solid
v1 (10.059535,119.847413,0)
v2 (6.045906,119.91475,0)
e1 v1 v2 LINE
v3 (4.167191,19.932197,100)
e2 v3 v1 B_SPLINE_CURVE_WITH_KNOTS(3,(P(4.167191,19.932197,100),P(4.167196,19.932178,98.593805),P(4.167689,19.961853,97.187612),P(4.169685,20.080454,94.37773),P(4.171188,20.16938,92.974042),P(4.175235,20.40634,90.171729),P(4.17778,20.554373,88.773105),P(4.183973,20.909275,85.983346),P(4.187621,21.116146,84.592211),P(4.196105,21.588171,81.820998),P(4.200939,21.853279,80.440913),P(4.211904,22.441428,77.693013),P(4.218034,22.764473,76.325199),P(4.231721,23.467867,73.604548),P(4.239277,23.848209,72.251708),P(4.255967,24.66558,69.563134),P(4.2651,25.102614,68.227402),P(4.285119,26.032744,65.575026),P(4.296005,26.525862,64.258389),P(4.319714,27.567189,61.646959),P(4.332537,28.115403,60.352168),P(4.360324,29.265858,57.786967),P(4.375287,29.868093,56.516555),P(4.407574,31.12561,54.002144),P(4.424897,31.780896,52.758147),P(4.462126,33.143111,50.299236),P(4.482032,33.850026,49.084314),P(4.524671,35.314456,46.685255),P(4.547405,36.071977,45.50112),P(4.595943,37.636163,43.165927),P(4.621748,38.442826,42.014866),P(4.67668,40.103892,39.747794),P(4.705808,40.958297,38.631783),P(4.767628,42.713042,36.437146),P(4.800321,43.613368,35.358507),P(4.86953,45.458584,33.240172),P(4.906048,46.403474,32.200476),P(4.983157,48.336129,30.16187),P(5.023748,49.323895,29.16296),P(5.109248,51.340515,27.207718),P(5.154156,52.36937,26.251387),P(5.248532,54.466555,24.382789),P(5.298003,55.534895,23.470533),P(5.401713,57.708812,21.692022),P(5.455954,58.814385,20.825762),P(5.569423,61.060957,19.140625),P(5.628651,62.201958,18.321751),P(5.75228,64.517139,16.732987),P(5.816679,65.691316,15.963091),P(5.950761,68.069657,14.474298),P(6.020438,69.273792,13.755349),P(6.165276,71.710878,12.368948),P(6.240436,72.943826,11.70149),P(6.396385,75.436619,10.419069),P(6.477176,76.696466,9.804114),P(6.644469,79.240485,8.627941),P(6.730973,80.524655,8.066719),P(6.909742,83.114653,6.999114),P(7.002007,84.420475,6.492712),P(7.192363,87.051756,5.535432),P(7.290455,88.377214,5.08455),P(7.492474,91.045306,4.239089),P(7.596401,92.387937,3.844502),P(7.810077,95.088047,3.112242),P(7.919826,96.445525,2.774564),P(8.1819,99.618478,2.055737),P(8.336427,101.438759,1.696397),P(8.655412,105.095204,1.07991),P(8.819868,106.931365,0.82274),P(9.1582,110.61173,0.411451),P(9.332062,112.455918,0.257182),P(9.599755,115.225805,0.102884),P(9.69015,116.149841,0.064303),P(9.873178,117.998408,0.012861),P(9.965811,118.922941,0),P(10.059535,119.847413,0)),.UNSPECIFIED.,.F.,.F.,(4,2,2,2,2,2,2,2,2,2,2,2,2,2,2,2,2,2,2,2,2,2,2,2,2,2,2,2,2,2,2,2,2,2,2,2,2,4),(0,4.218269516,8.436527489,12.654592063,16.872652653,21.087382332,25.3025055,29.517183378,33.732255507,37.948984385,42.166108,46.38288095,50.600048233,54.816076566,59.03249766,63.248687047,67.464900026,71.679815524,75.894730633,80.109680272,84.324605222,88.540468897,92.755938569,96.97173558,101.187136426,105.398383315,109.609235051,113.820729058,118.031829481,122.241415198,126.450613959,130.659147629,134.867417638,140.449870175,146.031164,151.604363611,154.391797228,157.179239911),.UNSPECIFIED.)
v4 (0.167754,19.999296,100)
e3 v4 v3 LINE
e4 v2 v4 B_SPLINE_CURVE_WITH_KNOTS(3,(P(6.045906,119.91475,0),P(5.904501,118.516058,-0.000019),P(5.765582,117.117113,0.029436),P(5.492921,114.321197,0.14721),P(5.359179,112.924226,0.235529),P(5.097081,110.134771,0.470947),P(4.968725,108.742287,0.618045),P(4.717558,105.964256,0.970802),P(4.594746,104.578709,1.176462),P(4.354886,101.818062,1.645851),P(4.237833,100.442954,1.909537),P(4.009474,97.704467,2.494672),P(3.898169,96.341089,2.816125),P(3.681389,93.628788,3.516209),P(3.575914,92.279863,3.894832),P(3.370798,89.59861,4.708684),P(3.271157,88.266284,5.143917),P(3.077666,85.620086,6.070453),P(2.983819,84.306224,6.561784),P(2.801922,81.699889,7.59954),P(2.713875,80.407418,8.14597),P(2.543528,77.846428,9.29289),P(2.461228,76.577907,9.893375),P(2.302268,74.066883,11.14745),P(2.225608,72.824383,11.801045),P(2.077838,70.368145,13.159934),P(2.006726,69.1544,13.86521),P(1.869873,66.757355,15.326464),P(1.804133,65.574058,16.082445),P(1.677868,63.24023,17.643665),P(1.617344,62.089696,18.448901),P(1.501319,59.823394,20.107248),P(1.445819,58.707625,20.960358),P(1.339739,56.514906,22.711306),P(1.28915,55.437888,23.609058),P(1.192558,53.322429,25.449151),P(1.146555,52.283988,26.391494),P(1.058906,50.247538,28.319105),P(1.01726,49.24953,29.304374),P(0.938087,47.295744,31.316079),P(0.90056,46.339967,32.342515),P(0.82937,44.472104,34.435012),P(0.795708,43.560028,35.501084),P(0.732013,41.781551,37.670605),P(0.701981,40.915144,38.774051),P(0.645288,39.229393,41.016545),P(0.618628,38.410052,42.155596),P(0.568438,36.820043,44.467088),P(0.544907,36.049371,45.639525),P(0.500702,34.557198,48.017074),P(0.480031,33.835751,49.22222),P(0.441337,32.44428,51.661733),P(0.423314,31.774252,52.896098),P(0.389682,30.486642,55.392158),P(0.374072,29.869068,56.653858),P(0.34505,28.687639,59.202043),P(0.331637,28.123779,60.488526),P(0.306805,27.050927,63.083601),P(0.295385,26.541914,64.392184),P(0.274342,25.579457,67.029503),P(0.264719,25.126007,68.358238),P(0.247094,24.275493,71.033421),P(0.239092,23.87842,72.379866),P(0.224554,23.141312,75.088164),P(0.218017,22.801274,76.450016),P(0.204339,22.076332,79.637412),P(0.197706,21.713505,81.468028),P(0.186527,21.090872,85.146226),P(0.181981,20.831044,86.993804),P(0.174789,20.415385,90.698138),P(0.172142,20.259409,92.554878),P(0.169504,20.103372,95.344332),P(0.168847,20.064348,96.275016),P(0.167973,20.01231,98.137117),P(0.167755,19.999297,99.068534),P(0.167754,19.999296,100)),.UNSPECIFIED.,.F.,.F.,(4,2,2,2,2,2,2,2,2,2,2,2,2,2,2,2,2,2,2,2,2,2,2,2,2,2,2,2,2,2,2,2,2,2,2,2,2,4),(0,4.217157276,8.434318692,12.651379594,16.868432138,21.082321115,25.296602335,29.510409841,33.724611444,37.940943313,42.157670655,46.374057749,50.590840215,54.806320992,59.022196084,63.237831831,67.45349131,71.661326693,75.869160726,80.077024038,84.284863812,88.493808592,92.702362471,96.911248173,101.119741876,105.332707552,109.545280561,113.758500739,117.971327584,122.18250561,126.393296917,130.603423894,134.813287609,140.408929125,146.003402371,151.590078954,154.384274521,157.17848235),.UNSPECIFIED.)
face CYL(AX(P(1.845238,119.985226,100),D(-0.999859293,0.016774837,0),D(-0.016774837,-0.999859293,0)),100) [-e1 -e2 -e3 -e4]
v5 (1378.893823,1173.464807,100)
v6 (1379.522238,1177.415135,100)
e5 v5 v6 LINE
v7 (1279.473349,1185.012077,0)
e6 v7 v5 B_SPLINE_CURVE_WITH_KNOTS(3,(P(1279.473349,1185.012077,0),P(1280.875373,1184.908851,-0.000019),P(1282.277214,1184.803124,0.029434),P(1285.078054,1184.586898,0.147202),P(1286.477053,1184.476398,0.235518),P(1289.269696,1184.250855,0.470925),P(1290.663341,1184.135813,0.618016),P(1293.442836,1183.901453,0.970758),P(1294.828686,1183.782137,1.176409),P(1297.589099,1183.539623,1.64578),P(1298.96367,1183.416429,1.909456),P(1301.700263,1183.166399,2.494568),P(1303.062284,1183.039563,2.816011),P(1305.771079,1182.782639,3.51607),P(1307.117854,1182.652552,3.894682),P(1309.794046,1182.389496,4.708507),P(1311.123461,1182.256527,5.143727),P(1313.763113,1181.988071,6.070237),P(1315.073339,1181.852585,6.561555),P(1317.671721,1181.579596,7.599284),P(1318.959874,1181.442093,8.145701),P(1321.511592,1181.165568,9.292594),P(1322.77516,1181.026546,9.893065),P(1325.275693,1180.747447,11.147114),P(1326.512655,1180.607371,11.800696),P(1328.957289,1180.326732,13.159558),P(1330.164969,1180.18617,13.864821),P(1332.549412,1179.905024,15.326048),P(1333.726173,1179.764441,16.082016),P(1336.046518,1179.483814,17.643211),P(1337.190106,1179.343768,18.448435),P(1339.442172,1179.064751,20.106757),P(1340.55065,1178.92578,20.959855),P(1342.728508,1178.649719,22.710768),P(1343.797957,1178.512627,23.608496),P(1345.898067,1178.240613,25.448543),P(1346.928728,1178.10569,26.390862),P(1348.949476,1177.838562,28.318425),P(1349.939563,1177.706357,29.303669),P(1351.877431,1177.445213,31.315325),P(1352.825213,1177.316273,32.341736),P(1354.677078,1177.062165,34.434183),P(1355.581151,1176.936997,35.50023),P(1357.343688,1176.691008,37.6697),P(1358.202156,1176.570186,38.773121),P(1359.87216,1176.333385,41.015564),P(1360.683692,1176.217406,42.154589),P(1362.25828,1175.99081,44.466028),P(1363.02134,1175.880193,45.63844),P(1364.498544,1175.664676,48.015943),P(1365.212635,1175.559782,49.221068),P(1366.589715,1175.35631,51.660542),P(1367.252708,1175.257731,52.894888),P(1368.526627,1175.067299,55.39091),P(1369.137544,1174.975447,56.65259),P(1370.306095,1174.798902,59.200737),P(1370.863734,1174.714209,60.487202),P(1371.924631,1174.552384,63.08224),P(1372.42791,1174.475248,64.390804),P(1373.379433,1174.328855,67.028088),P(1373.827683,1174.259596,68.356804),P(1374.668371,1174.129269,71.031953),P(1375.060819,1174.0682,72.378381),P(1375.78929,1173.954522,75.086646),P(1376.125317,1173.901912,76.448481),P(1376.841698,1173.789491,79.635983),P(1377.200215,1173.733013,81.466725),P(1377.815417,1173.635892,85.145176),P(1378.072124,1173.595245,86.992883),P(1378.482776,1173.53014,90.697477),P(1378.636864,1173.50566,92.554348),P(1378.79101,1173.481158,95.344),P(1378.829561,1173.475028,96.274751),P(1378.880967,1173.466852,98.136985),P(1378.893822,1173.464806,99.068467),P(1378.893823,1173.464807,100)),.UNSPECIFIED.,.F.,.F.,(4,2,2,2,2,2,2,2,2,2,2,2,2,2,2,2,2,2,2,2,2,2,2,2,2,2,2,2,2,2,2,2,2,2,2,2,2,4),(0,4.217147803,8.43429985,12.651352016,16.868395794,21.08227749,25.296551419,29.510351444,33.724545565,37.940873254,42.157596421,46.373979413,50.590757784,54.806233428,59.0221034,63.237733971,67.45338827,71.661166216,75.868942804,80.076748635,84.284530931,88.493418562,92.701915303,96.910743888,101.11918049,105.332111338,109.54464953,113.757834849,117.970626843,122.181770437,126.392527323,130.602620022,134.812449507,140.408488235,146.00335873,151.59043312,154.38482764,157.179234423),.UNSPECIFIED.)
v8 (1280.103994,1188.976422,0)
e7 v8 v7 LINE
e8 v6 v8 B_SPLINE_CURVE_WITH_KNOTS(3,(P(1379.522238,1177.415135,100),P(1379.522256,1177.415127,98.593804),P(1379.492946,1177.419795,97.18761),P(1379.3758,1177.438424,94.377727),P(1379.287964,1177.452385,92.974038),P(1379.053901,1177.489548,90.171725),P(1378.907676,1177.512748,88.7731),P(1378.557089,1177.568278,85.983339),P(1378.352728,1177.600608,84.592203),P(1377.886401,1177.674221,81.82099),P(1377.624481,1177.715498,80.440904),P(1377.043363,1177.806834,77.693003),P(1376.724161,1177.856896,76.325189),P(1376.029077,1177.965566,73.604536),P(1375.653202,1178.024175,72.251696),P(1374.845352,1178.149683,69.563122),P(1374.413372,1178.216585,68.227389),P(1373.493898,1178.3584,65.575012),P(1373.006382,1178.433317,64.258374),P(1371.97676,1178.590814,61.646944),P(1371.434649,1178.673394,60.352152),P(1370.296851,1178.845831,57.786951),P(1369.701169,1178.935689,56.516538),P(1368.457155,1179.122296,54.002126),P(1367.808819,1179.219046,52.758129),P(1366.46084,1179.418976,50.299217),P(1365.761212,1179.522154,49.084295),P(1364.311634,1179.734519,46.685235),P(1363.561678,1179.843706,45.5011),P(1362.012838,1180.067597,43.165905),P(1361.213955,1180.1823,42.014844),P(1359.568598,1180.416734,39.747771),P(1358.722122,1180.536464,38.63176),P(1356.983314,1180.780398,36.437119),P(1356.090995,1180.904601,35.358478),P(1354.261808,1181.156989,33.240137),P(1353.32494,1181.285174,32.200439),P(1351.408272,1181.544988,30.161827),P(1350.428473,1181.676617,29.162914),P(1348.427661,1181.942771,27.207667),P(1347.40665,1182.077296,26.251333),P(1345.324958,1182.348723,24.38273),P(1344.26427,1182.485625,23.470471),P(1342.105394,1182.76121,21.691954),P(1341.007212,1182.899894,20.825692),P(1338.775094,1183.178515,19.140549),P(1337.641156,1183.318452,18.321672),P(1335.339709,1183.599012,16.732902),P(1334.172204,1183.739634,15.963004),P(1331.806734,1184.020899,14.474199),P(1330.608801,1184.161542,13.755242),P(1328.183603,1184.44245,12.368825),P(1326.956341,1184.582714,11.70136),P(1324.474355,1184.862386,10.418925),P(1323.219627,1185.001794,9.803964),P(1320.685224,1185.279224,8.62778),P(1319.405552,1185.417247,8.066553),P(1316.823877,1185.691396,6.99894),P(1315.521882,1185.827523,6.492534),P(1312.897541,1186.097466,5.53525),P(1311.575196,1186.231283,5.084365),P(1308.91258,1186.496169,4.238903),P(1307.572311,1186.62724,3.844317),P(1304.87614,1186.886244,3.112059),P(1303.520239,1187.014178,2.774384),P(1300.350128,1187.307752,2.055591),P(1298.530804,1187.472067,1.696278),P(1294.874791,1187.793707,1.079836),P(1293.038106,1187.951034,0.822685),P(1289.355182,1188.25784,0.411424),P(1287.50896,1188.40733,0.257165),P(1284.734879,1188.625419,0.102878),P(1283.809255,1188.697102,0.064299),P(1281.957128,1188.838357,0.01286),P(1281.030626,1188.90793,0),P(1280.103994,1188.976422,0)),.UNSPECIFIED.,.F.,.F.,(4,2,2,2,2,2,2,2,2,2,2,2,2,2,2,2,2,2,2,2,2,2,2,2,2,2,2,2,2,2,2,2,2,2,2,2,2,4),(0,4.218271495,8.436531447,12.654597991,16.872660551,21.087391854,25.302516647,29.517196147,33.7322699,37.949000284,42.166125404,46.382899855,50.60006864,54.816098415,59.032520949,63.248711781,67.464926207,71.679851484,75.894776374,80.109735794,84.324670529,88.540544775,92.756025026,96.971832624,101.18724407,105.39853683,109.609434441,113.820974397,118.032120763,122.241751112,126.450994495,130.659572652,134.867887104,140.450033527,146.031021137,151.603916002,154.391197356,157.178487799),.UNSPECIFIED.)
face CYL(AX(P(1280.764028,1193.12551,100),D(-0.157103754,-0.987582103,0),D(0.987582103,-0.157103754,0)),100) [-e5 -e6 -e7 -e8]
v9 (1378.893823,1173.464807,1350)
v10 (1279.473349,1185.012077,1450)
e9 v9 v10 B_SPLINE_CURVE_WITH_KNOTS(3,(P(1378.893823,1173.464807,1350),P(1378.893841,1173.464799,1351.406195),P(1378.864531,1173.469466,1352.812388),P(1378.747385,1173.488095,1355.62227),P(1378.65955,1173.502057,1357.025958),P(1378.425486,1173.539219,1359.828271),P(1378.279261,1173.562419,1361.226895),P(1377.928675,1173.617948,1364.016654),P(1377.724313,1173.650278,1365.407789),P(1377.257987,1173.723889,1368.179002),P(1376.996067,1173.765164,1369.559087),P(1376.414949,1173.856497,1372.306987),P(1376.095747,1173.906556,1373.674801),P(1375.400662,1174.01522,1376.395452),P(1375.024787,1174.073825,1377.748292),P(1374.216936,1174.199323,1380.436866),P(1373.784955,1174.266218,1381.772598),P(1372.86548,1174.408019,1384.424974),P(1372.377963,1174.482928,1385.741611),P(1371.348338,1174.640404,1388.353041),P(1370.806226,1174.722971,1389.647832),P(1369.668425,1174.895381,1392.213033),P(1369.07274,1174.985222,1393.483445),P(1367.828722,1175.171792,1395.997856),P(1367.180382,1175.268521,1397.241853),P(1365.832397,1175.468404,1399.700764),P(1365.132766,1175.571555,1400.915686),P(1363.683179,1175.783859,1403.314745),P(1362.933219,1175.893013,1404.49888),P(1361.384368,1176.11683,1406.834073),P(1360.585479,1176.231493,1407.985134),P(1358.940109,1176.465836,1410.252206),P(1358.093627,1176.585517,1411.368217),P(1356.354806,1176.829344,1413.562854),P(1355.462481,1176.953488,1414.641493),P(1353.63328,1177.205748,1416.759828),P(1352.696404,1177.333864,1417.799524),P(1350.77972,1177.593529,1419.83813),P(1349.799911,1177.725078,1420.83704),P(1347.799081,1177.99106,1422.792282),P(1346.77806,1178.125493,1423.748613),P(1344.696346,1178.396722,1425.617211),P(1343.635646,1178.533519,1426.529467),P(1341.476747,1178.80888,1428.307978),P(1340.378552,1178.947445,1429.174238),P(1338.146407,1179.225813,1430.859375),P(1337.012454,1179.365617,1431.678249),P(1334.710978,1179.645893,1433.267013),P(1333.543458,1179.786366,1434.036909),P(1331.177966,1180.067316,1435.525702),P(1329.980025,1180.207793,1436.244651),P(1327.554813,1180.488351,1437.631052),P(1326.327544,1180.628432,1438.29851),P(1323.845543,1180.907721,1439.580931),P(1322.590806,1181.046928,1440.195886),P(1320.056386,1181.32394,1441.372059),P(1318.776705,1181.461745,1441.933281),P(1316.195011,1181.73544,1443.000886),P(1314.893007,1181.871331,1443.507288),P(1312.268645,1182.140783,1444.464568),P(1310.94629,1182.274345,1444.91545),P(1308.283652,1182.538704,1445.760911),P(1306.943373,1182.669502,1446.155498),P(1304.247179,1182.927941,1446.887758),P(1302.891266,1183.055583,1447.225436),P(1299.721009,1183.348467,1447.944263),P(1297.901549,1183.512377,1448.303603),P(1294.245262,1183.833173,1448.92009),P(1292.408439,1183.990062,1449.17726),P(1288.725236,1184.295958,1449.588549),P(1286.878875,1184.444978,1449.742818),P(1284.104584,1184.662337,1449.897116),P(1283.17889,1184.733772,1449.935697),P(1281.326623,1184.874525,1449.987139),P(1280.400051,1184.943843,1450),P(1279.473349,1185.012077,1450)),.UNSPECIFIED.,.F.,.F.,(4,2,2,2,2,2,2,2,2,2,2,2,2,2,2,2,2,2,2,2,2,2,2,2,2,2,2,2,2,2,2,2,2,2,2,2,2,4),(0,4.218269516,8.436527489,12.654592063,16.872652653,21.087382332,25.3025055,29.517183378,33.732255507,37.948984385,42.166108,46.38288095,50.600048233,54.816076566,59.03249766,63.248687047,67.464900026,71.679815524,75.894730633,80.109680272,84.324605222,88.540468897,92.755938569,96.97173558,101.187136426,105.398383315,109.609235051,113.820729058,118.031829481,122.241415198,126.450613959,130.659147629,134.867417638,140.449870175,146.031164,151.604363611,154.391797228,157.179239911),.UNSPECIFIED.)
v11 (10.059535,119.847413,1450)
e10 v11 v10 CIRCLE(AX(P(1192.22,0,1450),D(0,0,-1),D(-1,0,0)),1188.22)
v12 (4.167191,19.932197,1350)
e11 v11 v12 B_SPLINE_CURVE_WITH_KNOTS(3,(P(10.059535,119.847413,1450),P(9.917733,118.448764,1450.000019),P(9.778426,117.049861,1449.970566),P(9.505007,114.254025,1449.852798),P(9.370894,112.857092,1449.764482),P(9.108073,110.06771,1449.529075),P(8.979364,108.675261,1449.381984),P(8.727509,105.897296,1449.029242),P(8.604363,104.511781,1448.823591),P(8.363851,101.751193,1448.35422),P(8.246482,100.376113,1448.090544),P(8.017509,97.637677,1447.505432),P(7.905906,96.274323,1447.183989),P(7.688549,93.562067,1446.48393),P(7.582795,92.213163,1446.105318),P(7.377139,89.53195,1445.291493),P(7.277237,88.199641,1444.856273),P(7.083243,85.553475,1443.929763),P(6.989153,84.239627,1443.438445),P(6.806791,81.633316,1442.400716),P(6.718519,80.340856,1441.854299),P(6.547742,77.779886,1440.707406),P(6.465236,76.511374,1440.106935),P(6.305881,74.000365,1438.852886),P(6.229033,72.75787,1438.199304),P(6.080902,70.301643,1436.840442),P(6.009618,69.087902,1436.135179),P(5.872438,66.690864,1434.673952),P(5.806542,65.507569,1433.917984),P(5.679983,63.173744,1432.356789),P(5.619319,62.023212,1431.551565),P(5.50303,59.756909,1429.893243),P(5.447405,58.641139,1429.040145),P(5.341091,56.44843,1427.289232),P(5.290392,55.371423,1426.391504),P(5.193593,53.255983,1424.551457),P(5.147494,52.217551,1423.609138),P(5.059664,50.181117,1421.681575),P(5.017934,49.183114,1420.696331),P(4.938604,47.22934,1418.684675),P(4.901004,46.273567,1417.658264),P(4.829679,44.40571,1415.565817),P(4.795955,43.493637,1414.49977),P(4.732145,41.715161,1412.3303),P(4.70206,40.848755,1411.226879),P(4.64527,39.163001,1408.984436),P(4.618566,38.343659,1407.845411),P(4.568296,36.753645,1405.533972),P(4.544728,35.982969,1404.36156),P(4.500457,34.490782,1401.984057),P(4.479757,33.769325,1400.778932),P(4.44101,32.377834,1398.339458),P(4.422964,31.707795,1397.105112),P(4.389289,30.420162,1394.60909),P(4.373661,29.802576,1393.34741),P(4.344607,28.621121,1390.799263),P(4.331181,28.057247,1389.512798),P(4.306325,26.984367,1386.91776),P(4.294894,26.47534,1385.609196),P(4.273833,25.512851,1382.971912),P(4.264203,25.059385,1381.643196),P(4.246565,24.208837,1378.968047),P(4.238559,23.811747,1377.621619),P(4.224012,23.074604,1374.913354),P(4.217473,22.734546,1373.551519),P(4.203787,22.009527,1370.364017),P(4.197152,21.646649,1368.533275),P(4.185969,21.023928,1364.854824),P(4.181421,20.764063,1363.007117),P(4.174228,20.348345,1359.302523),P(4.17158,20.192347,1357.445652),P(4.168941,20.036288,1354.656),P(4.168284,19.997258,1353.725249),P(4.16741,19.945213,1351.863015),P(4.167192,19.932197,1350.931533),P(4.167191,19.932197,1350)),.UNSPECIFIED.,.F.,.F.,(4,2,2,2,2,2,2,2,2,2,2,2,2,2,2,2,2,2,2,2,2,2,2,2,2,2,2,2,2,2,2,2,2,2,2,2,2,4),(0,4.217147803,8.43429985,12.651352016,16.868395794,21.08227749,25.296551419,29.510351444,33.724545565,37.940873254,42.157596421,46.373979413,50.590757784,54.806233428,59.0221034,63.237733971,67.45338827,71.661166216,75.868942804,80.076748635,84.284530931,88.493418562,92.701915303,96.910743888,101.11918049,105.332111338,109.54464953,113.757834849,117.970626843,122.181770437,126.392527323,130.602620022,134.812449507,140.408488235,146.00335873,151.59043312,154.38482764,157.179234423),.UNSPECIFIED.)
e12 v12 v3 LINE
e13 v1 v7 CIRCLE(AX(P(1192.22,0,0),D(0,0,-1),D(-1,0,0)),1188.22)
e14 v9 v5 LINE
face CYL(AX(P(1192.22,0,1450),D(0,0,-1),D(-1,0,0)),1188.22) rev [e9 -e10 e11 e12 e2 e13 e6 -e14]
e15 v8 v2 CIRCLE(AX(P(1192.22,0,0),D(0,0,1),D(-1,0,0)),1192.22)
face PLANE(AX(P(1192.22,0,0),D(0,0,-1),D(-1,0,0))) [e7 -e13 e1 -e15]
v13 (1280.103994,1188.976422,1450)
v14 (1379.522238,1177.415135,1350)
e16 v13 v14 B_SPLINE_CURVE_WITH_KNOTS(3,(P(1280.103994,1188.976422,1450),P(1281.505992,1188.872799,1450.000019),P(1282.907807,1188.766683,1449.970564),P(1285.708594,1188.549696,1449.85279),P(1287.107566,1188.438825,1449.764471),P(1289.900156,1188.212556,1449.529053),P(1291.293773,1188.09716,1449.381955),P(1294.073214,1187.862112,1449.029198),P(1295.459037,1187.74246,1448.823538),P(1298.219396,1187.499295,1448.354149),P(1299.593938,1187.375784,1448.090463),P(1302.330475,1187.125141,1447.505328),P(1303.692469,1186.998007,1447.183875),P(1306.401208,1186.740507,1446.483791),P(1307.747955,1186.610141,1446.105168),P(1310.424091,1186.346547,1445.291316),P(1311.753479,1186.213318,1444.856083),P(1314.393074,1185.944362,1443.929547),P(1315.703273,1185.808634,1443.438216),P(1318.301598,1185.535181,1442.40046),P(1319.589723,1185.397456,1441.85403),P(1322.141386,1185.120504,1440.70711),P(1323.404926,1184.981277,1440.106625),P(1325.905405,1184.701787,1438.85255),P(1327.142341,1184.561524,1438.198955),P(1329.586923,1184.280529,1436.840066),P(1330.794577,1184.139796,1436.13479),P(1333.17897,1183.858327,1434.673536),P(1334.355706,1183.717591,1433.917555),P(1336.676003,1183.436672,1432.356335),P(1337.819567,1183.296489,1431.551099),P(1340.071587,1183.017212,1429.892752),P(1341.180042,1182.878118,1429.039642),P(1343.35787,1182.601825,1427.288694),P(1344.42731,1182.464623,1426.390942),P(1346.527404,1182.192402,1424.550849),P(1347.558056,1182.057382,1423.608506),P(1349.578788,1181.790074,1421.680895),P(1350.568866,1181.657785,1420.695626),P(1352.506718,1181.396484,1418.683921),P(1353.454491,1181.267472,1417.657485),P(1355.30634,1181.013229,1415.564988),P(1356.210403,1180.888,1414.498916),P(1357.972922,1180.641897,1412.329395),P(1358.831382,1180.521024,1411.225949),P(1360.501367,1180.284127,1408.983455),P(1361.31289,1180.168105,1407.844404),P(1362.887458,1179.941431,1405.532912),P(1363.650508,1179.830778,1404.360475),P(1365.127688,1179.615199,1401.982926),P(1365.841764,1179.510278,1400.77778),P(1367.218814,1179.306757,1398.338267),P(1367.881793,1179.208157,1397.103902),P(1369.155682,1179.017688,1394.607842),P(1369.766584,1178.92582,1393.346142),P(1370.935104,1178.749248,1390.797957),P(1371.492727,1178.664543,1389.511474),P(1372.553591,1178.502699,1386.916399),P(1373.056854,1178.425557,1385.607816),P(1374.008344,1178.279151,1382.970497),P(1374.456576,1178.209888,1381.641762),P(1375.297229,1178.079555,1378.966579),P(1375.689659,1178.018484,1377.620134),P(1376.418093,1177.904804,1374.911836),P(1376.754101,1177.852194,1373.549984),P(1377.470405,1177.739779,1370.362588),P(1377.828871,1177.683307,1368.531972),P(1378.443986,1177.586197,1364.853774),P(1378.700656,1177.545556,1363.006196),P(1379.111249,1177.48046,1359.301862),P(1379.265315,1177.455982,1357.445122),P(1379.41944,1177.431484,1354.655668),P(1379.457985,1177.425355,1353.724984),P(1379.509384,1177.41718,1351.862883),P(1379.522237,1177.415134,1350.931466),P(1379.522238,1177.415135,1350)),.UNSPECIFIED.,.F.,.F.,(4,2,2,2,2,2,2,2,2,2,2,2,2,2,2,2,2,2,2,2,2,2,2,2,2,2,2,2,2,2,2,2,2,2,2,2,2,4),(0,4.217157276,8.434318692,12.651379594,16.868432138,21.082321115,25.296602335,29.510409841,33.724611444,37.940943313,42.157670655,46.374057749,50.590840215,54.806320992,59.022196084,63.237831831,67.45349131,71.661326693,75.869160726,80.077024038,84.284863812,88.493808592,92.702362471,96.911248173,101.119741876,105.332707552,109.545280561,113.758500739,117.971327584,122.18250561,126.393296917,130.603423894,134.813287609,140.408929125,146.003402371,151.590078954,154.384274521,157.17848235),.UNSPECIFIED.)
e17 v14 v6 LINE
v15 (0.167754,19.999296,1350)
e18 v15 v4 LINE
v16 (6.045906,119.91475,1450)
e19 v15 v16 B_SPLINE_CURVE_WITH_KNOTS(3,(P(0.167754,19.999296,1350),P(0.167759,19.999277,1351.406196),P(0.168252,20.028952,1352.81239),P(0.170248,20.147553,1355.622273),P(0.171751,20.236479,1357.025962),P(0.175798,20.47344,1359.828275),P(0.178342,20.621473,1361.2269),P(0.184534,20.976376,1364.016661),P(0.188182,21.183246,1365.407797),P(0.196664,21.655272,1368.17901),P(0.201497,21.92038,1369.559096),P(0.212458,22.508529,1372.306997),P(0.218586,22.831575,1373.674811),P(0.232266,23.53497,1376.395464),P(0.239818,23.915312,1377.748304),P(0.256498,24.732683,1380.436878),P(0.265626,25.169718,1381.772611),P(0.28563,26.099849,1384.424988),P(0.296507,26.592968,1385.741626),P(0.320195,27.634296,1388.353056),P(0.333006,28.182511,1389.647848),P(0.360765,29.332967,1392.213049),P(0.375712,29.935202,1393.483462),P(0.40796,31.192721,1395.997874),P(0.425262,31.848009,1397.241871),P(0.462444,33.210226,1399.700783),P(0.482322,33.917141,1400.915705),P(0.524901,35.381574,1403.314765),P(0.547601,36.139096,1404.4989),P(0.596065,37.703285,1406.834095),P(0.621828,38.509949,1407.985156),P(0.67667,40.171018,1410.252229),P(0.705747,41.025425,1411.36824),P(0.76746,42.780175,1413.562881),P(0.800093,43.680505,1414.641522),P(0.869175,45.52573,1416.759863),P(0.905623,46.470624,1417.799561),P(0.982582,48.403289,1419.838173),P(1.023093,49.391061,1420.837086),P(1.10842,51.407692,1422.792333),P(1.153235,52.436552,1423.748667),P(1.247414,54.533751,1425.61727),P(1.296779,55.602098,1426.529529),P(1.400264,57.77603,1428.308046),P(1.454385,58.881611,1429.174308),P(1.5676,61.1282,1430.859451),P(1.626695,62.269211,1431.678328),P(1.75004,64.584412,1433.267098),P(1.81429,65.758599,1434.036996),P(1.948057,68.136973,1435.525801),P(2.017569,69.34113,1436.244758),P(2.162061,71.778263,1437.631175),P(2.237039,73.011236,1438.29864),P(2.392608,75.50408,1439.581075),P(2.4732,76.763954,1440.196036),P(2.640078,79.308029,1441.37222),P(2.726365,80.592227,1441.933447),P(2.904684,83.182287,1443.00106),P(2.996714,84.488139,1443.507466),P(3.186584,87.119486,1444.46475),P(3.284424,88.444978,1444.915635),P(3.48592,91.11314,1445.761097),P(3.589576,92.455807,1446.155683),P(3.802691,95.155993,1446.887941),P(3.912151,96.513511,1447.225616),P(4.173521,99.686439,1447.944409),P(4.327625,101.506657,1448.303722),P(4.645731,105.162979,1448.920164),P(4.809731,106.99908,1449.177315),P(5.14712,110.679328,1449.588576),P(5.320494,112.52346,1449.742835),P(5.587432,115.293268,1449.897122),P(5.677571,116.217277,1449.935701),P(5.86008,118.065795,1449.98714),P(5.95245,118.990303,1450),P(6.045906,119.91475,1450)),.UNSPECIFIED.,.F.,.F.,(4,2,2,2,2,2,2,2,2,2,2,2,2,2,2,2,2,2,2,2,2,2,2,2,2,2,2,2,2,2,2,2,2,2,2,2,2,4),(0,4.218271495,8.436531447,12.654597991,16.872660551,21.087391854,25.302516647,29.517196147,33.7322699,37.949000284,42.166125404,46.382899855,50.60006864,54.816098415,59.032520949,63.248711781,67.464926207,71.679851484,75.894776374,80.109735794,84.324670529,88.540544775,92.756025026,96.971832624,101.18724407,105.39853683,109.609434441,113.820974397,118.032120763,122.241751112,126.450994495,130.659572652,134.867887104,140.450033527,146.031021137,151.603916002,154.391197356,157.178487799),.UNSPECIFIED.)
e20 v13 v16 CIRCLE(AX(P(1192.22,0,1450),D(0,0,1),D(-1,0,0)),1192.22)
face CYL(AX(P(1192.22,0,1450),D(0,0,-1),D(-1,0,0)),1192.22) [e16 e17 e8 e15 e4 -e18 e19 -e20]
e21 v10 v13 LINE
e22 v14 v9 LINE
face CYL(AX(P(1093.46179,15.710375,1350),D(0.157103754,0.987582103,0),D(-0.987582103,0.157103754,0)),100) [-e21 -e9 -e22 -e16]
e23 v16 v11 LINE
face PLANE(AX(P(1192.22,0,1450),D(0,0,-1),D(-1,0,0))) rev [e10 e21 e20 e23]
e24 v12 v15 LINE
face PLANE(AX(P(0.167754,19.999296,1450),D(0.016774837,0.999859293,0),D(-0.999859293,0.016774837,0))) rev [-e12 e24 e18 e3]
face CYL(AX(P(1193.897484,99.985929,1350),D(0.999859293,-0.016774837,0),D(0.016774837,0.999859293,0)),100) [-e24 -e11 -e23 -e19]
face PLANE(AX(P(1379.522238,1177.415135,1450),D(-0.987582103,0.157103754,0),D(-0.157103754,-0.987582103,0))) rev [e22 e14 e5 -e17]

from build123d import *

# Parameters (mm, degrees)
BOSS_EXTRUDE1_DEPTH = 1450
FILLET1_START       = -1
FILLET1_DEPTH       = 10
FILLET1_START_2     = 1370
FILLET1_2_DEPTH     = 11


with BuildPart() as part:
    # Sketch1 → Boss-Extrude1 (new body)
    with BuildSketch(Plane.XY):
        with BuildLine():
            Line((1379.522237955, 1177.41513497), (1378.893822938, 1173.464806558))
            ThreePointArc((1378.893822938, 1173.464806558), (428.446906418, 910.229328203), (4.167191444, 19.932197101))
            Line((4.167191444, 19.932197101), (0.167754274, 19.99929645))
            ThreePointArc((0.167754274, 19.99929645), (425.87575598, 913.293505975), (1379.522237955, 1177.41513497))
        make_face()
    extrude(amount=BOSS_EXTRUDE1_DEPTH)

    # Fillet1: read off the stored shape, not the designer's step
    # Fillet1 outline → Fillet1 (cut)
    with BuildSketch(Plane(origin=(0, 0, 0), x_dir=(0.016774837236560897, 0.9998592925185458, 0), z_dir=(0.9998592925185458, -0.016774837236560897, 0)).offset(FILLET1_START)):
        with BuildLine():
            ThreePointArc((119.99929645, 0), (49.288618332, 29.289321882), (19.99929645, 100))
            Line((19.99929645, 100), (19.99929645, 0))
            Line((19.99929645, 0), (119.99929645, 0))
        make_face()
        with BuildLine():
            ThreePointArc((19.99929645, 1350), (49.288618331, 1420.710678119), (119.99929645, 1450))
            Line((119.99929645, 1450), (19.99929645, 1450))
            Line((19.99929645, 1450), (19.99929645, 1350))
        make_face()
    extrude(amount=FILLET1_DEPTH, mode=Mode.SUBTRACT)

    # Fillet1 2 outline → Fillet1 2 (cut)
    with BuildSketch(Plane(origin=(0, 0, 0), x_dir=(0.9875821031103624, -0.15710375430305096, 0), z_dir=(0.15710375430305093, 0.9875821031103625, 0)).offset(FILLET1_START_2)):
        with BuildLine():
            Line((1177.41513497, 0), (1077.41513497, 0))
            ThreePointArc((1077.41513497, 0), (1148.125813089, -29.289321881), (1177.41513497, -100))
            Line((1177.41513497, -100), (1177.41513497, 0))
        make_face()
        with BuildLine():
            Line((1177.41513497, -1450), (1177.41513497, -1350))
            ThreePointArc((1177.41513497, -1350), (1148.125813089, -1420.710678119), (1077.41513497, -1450))
            Line((1077.41513497, -1450), (1177.41513497, -1450))
        make_face()
    extrude(amount=FILLET1_2_DEPTH, mode=Mode.SUBTRACT)


solid = part.part
